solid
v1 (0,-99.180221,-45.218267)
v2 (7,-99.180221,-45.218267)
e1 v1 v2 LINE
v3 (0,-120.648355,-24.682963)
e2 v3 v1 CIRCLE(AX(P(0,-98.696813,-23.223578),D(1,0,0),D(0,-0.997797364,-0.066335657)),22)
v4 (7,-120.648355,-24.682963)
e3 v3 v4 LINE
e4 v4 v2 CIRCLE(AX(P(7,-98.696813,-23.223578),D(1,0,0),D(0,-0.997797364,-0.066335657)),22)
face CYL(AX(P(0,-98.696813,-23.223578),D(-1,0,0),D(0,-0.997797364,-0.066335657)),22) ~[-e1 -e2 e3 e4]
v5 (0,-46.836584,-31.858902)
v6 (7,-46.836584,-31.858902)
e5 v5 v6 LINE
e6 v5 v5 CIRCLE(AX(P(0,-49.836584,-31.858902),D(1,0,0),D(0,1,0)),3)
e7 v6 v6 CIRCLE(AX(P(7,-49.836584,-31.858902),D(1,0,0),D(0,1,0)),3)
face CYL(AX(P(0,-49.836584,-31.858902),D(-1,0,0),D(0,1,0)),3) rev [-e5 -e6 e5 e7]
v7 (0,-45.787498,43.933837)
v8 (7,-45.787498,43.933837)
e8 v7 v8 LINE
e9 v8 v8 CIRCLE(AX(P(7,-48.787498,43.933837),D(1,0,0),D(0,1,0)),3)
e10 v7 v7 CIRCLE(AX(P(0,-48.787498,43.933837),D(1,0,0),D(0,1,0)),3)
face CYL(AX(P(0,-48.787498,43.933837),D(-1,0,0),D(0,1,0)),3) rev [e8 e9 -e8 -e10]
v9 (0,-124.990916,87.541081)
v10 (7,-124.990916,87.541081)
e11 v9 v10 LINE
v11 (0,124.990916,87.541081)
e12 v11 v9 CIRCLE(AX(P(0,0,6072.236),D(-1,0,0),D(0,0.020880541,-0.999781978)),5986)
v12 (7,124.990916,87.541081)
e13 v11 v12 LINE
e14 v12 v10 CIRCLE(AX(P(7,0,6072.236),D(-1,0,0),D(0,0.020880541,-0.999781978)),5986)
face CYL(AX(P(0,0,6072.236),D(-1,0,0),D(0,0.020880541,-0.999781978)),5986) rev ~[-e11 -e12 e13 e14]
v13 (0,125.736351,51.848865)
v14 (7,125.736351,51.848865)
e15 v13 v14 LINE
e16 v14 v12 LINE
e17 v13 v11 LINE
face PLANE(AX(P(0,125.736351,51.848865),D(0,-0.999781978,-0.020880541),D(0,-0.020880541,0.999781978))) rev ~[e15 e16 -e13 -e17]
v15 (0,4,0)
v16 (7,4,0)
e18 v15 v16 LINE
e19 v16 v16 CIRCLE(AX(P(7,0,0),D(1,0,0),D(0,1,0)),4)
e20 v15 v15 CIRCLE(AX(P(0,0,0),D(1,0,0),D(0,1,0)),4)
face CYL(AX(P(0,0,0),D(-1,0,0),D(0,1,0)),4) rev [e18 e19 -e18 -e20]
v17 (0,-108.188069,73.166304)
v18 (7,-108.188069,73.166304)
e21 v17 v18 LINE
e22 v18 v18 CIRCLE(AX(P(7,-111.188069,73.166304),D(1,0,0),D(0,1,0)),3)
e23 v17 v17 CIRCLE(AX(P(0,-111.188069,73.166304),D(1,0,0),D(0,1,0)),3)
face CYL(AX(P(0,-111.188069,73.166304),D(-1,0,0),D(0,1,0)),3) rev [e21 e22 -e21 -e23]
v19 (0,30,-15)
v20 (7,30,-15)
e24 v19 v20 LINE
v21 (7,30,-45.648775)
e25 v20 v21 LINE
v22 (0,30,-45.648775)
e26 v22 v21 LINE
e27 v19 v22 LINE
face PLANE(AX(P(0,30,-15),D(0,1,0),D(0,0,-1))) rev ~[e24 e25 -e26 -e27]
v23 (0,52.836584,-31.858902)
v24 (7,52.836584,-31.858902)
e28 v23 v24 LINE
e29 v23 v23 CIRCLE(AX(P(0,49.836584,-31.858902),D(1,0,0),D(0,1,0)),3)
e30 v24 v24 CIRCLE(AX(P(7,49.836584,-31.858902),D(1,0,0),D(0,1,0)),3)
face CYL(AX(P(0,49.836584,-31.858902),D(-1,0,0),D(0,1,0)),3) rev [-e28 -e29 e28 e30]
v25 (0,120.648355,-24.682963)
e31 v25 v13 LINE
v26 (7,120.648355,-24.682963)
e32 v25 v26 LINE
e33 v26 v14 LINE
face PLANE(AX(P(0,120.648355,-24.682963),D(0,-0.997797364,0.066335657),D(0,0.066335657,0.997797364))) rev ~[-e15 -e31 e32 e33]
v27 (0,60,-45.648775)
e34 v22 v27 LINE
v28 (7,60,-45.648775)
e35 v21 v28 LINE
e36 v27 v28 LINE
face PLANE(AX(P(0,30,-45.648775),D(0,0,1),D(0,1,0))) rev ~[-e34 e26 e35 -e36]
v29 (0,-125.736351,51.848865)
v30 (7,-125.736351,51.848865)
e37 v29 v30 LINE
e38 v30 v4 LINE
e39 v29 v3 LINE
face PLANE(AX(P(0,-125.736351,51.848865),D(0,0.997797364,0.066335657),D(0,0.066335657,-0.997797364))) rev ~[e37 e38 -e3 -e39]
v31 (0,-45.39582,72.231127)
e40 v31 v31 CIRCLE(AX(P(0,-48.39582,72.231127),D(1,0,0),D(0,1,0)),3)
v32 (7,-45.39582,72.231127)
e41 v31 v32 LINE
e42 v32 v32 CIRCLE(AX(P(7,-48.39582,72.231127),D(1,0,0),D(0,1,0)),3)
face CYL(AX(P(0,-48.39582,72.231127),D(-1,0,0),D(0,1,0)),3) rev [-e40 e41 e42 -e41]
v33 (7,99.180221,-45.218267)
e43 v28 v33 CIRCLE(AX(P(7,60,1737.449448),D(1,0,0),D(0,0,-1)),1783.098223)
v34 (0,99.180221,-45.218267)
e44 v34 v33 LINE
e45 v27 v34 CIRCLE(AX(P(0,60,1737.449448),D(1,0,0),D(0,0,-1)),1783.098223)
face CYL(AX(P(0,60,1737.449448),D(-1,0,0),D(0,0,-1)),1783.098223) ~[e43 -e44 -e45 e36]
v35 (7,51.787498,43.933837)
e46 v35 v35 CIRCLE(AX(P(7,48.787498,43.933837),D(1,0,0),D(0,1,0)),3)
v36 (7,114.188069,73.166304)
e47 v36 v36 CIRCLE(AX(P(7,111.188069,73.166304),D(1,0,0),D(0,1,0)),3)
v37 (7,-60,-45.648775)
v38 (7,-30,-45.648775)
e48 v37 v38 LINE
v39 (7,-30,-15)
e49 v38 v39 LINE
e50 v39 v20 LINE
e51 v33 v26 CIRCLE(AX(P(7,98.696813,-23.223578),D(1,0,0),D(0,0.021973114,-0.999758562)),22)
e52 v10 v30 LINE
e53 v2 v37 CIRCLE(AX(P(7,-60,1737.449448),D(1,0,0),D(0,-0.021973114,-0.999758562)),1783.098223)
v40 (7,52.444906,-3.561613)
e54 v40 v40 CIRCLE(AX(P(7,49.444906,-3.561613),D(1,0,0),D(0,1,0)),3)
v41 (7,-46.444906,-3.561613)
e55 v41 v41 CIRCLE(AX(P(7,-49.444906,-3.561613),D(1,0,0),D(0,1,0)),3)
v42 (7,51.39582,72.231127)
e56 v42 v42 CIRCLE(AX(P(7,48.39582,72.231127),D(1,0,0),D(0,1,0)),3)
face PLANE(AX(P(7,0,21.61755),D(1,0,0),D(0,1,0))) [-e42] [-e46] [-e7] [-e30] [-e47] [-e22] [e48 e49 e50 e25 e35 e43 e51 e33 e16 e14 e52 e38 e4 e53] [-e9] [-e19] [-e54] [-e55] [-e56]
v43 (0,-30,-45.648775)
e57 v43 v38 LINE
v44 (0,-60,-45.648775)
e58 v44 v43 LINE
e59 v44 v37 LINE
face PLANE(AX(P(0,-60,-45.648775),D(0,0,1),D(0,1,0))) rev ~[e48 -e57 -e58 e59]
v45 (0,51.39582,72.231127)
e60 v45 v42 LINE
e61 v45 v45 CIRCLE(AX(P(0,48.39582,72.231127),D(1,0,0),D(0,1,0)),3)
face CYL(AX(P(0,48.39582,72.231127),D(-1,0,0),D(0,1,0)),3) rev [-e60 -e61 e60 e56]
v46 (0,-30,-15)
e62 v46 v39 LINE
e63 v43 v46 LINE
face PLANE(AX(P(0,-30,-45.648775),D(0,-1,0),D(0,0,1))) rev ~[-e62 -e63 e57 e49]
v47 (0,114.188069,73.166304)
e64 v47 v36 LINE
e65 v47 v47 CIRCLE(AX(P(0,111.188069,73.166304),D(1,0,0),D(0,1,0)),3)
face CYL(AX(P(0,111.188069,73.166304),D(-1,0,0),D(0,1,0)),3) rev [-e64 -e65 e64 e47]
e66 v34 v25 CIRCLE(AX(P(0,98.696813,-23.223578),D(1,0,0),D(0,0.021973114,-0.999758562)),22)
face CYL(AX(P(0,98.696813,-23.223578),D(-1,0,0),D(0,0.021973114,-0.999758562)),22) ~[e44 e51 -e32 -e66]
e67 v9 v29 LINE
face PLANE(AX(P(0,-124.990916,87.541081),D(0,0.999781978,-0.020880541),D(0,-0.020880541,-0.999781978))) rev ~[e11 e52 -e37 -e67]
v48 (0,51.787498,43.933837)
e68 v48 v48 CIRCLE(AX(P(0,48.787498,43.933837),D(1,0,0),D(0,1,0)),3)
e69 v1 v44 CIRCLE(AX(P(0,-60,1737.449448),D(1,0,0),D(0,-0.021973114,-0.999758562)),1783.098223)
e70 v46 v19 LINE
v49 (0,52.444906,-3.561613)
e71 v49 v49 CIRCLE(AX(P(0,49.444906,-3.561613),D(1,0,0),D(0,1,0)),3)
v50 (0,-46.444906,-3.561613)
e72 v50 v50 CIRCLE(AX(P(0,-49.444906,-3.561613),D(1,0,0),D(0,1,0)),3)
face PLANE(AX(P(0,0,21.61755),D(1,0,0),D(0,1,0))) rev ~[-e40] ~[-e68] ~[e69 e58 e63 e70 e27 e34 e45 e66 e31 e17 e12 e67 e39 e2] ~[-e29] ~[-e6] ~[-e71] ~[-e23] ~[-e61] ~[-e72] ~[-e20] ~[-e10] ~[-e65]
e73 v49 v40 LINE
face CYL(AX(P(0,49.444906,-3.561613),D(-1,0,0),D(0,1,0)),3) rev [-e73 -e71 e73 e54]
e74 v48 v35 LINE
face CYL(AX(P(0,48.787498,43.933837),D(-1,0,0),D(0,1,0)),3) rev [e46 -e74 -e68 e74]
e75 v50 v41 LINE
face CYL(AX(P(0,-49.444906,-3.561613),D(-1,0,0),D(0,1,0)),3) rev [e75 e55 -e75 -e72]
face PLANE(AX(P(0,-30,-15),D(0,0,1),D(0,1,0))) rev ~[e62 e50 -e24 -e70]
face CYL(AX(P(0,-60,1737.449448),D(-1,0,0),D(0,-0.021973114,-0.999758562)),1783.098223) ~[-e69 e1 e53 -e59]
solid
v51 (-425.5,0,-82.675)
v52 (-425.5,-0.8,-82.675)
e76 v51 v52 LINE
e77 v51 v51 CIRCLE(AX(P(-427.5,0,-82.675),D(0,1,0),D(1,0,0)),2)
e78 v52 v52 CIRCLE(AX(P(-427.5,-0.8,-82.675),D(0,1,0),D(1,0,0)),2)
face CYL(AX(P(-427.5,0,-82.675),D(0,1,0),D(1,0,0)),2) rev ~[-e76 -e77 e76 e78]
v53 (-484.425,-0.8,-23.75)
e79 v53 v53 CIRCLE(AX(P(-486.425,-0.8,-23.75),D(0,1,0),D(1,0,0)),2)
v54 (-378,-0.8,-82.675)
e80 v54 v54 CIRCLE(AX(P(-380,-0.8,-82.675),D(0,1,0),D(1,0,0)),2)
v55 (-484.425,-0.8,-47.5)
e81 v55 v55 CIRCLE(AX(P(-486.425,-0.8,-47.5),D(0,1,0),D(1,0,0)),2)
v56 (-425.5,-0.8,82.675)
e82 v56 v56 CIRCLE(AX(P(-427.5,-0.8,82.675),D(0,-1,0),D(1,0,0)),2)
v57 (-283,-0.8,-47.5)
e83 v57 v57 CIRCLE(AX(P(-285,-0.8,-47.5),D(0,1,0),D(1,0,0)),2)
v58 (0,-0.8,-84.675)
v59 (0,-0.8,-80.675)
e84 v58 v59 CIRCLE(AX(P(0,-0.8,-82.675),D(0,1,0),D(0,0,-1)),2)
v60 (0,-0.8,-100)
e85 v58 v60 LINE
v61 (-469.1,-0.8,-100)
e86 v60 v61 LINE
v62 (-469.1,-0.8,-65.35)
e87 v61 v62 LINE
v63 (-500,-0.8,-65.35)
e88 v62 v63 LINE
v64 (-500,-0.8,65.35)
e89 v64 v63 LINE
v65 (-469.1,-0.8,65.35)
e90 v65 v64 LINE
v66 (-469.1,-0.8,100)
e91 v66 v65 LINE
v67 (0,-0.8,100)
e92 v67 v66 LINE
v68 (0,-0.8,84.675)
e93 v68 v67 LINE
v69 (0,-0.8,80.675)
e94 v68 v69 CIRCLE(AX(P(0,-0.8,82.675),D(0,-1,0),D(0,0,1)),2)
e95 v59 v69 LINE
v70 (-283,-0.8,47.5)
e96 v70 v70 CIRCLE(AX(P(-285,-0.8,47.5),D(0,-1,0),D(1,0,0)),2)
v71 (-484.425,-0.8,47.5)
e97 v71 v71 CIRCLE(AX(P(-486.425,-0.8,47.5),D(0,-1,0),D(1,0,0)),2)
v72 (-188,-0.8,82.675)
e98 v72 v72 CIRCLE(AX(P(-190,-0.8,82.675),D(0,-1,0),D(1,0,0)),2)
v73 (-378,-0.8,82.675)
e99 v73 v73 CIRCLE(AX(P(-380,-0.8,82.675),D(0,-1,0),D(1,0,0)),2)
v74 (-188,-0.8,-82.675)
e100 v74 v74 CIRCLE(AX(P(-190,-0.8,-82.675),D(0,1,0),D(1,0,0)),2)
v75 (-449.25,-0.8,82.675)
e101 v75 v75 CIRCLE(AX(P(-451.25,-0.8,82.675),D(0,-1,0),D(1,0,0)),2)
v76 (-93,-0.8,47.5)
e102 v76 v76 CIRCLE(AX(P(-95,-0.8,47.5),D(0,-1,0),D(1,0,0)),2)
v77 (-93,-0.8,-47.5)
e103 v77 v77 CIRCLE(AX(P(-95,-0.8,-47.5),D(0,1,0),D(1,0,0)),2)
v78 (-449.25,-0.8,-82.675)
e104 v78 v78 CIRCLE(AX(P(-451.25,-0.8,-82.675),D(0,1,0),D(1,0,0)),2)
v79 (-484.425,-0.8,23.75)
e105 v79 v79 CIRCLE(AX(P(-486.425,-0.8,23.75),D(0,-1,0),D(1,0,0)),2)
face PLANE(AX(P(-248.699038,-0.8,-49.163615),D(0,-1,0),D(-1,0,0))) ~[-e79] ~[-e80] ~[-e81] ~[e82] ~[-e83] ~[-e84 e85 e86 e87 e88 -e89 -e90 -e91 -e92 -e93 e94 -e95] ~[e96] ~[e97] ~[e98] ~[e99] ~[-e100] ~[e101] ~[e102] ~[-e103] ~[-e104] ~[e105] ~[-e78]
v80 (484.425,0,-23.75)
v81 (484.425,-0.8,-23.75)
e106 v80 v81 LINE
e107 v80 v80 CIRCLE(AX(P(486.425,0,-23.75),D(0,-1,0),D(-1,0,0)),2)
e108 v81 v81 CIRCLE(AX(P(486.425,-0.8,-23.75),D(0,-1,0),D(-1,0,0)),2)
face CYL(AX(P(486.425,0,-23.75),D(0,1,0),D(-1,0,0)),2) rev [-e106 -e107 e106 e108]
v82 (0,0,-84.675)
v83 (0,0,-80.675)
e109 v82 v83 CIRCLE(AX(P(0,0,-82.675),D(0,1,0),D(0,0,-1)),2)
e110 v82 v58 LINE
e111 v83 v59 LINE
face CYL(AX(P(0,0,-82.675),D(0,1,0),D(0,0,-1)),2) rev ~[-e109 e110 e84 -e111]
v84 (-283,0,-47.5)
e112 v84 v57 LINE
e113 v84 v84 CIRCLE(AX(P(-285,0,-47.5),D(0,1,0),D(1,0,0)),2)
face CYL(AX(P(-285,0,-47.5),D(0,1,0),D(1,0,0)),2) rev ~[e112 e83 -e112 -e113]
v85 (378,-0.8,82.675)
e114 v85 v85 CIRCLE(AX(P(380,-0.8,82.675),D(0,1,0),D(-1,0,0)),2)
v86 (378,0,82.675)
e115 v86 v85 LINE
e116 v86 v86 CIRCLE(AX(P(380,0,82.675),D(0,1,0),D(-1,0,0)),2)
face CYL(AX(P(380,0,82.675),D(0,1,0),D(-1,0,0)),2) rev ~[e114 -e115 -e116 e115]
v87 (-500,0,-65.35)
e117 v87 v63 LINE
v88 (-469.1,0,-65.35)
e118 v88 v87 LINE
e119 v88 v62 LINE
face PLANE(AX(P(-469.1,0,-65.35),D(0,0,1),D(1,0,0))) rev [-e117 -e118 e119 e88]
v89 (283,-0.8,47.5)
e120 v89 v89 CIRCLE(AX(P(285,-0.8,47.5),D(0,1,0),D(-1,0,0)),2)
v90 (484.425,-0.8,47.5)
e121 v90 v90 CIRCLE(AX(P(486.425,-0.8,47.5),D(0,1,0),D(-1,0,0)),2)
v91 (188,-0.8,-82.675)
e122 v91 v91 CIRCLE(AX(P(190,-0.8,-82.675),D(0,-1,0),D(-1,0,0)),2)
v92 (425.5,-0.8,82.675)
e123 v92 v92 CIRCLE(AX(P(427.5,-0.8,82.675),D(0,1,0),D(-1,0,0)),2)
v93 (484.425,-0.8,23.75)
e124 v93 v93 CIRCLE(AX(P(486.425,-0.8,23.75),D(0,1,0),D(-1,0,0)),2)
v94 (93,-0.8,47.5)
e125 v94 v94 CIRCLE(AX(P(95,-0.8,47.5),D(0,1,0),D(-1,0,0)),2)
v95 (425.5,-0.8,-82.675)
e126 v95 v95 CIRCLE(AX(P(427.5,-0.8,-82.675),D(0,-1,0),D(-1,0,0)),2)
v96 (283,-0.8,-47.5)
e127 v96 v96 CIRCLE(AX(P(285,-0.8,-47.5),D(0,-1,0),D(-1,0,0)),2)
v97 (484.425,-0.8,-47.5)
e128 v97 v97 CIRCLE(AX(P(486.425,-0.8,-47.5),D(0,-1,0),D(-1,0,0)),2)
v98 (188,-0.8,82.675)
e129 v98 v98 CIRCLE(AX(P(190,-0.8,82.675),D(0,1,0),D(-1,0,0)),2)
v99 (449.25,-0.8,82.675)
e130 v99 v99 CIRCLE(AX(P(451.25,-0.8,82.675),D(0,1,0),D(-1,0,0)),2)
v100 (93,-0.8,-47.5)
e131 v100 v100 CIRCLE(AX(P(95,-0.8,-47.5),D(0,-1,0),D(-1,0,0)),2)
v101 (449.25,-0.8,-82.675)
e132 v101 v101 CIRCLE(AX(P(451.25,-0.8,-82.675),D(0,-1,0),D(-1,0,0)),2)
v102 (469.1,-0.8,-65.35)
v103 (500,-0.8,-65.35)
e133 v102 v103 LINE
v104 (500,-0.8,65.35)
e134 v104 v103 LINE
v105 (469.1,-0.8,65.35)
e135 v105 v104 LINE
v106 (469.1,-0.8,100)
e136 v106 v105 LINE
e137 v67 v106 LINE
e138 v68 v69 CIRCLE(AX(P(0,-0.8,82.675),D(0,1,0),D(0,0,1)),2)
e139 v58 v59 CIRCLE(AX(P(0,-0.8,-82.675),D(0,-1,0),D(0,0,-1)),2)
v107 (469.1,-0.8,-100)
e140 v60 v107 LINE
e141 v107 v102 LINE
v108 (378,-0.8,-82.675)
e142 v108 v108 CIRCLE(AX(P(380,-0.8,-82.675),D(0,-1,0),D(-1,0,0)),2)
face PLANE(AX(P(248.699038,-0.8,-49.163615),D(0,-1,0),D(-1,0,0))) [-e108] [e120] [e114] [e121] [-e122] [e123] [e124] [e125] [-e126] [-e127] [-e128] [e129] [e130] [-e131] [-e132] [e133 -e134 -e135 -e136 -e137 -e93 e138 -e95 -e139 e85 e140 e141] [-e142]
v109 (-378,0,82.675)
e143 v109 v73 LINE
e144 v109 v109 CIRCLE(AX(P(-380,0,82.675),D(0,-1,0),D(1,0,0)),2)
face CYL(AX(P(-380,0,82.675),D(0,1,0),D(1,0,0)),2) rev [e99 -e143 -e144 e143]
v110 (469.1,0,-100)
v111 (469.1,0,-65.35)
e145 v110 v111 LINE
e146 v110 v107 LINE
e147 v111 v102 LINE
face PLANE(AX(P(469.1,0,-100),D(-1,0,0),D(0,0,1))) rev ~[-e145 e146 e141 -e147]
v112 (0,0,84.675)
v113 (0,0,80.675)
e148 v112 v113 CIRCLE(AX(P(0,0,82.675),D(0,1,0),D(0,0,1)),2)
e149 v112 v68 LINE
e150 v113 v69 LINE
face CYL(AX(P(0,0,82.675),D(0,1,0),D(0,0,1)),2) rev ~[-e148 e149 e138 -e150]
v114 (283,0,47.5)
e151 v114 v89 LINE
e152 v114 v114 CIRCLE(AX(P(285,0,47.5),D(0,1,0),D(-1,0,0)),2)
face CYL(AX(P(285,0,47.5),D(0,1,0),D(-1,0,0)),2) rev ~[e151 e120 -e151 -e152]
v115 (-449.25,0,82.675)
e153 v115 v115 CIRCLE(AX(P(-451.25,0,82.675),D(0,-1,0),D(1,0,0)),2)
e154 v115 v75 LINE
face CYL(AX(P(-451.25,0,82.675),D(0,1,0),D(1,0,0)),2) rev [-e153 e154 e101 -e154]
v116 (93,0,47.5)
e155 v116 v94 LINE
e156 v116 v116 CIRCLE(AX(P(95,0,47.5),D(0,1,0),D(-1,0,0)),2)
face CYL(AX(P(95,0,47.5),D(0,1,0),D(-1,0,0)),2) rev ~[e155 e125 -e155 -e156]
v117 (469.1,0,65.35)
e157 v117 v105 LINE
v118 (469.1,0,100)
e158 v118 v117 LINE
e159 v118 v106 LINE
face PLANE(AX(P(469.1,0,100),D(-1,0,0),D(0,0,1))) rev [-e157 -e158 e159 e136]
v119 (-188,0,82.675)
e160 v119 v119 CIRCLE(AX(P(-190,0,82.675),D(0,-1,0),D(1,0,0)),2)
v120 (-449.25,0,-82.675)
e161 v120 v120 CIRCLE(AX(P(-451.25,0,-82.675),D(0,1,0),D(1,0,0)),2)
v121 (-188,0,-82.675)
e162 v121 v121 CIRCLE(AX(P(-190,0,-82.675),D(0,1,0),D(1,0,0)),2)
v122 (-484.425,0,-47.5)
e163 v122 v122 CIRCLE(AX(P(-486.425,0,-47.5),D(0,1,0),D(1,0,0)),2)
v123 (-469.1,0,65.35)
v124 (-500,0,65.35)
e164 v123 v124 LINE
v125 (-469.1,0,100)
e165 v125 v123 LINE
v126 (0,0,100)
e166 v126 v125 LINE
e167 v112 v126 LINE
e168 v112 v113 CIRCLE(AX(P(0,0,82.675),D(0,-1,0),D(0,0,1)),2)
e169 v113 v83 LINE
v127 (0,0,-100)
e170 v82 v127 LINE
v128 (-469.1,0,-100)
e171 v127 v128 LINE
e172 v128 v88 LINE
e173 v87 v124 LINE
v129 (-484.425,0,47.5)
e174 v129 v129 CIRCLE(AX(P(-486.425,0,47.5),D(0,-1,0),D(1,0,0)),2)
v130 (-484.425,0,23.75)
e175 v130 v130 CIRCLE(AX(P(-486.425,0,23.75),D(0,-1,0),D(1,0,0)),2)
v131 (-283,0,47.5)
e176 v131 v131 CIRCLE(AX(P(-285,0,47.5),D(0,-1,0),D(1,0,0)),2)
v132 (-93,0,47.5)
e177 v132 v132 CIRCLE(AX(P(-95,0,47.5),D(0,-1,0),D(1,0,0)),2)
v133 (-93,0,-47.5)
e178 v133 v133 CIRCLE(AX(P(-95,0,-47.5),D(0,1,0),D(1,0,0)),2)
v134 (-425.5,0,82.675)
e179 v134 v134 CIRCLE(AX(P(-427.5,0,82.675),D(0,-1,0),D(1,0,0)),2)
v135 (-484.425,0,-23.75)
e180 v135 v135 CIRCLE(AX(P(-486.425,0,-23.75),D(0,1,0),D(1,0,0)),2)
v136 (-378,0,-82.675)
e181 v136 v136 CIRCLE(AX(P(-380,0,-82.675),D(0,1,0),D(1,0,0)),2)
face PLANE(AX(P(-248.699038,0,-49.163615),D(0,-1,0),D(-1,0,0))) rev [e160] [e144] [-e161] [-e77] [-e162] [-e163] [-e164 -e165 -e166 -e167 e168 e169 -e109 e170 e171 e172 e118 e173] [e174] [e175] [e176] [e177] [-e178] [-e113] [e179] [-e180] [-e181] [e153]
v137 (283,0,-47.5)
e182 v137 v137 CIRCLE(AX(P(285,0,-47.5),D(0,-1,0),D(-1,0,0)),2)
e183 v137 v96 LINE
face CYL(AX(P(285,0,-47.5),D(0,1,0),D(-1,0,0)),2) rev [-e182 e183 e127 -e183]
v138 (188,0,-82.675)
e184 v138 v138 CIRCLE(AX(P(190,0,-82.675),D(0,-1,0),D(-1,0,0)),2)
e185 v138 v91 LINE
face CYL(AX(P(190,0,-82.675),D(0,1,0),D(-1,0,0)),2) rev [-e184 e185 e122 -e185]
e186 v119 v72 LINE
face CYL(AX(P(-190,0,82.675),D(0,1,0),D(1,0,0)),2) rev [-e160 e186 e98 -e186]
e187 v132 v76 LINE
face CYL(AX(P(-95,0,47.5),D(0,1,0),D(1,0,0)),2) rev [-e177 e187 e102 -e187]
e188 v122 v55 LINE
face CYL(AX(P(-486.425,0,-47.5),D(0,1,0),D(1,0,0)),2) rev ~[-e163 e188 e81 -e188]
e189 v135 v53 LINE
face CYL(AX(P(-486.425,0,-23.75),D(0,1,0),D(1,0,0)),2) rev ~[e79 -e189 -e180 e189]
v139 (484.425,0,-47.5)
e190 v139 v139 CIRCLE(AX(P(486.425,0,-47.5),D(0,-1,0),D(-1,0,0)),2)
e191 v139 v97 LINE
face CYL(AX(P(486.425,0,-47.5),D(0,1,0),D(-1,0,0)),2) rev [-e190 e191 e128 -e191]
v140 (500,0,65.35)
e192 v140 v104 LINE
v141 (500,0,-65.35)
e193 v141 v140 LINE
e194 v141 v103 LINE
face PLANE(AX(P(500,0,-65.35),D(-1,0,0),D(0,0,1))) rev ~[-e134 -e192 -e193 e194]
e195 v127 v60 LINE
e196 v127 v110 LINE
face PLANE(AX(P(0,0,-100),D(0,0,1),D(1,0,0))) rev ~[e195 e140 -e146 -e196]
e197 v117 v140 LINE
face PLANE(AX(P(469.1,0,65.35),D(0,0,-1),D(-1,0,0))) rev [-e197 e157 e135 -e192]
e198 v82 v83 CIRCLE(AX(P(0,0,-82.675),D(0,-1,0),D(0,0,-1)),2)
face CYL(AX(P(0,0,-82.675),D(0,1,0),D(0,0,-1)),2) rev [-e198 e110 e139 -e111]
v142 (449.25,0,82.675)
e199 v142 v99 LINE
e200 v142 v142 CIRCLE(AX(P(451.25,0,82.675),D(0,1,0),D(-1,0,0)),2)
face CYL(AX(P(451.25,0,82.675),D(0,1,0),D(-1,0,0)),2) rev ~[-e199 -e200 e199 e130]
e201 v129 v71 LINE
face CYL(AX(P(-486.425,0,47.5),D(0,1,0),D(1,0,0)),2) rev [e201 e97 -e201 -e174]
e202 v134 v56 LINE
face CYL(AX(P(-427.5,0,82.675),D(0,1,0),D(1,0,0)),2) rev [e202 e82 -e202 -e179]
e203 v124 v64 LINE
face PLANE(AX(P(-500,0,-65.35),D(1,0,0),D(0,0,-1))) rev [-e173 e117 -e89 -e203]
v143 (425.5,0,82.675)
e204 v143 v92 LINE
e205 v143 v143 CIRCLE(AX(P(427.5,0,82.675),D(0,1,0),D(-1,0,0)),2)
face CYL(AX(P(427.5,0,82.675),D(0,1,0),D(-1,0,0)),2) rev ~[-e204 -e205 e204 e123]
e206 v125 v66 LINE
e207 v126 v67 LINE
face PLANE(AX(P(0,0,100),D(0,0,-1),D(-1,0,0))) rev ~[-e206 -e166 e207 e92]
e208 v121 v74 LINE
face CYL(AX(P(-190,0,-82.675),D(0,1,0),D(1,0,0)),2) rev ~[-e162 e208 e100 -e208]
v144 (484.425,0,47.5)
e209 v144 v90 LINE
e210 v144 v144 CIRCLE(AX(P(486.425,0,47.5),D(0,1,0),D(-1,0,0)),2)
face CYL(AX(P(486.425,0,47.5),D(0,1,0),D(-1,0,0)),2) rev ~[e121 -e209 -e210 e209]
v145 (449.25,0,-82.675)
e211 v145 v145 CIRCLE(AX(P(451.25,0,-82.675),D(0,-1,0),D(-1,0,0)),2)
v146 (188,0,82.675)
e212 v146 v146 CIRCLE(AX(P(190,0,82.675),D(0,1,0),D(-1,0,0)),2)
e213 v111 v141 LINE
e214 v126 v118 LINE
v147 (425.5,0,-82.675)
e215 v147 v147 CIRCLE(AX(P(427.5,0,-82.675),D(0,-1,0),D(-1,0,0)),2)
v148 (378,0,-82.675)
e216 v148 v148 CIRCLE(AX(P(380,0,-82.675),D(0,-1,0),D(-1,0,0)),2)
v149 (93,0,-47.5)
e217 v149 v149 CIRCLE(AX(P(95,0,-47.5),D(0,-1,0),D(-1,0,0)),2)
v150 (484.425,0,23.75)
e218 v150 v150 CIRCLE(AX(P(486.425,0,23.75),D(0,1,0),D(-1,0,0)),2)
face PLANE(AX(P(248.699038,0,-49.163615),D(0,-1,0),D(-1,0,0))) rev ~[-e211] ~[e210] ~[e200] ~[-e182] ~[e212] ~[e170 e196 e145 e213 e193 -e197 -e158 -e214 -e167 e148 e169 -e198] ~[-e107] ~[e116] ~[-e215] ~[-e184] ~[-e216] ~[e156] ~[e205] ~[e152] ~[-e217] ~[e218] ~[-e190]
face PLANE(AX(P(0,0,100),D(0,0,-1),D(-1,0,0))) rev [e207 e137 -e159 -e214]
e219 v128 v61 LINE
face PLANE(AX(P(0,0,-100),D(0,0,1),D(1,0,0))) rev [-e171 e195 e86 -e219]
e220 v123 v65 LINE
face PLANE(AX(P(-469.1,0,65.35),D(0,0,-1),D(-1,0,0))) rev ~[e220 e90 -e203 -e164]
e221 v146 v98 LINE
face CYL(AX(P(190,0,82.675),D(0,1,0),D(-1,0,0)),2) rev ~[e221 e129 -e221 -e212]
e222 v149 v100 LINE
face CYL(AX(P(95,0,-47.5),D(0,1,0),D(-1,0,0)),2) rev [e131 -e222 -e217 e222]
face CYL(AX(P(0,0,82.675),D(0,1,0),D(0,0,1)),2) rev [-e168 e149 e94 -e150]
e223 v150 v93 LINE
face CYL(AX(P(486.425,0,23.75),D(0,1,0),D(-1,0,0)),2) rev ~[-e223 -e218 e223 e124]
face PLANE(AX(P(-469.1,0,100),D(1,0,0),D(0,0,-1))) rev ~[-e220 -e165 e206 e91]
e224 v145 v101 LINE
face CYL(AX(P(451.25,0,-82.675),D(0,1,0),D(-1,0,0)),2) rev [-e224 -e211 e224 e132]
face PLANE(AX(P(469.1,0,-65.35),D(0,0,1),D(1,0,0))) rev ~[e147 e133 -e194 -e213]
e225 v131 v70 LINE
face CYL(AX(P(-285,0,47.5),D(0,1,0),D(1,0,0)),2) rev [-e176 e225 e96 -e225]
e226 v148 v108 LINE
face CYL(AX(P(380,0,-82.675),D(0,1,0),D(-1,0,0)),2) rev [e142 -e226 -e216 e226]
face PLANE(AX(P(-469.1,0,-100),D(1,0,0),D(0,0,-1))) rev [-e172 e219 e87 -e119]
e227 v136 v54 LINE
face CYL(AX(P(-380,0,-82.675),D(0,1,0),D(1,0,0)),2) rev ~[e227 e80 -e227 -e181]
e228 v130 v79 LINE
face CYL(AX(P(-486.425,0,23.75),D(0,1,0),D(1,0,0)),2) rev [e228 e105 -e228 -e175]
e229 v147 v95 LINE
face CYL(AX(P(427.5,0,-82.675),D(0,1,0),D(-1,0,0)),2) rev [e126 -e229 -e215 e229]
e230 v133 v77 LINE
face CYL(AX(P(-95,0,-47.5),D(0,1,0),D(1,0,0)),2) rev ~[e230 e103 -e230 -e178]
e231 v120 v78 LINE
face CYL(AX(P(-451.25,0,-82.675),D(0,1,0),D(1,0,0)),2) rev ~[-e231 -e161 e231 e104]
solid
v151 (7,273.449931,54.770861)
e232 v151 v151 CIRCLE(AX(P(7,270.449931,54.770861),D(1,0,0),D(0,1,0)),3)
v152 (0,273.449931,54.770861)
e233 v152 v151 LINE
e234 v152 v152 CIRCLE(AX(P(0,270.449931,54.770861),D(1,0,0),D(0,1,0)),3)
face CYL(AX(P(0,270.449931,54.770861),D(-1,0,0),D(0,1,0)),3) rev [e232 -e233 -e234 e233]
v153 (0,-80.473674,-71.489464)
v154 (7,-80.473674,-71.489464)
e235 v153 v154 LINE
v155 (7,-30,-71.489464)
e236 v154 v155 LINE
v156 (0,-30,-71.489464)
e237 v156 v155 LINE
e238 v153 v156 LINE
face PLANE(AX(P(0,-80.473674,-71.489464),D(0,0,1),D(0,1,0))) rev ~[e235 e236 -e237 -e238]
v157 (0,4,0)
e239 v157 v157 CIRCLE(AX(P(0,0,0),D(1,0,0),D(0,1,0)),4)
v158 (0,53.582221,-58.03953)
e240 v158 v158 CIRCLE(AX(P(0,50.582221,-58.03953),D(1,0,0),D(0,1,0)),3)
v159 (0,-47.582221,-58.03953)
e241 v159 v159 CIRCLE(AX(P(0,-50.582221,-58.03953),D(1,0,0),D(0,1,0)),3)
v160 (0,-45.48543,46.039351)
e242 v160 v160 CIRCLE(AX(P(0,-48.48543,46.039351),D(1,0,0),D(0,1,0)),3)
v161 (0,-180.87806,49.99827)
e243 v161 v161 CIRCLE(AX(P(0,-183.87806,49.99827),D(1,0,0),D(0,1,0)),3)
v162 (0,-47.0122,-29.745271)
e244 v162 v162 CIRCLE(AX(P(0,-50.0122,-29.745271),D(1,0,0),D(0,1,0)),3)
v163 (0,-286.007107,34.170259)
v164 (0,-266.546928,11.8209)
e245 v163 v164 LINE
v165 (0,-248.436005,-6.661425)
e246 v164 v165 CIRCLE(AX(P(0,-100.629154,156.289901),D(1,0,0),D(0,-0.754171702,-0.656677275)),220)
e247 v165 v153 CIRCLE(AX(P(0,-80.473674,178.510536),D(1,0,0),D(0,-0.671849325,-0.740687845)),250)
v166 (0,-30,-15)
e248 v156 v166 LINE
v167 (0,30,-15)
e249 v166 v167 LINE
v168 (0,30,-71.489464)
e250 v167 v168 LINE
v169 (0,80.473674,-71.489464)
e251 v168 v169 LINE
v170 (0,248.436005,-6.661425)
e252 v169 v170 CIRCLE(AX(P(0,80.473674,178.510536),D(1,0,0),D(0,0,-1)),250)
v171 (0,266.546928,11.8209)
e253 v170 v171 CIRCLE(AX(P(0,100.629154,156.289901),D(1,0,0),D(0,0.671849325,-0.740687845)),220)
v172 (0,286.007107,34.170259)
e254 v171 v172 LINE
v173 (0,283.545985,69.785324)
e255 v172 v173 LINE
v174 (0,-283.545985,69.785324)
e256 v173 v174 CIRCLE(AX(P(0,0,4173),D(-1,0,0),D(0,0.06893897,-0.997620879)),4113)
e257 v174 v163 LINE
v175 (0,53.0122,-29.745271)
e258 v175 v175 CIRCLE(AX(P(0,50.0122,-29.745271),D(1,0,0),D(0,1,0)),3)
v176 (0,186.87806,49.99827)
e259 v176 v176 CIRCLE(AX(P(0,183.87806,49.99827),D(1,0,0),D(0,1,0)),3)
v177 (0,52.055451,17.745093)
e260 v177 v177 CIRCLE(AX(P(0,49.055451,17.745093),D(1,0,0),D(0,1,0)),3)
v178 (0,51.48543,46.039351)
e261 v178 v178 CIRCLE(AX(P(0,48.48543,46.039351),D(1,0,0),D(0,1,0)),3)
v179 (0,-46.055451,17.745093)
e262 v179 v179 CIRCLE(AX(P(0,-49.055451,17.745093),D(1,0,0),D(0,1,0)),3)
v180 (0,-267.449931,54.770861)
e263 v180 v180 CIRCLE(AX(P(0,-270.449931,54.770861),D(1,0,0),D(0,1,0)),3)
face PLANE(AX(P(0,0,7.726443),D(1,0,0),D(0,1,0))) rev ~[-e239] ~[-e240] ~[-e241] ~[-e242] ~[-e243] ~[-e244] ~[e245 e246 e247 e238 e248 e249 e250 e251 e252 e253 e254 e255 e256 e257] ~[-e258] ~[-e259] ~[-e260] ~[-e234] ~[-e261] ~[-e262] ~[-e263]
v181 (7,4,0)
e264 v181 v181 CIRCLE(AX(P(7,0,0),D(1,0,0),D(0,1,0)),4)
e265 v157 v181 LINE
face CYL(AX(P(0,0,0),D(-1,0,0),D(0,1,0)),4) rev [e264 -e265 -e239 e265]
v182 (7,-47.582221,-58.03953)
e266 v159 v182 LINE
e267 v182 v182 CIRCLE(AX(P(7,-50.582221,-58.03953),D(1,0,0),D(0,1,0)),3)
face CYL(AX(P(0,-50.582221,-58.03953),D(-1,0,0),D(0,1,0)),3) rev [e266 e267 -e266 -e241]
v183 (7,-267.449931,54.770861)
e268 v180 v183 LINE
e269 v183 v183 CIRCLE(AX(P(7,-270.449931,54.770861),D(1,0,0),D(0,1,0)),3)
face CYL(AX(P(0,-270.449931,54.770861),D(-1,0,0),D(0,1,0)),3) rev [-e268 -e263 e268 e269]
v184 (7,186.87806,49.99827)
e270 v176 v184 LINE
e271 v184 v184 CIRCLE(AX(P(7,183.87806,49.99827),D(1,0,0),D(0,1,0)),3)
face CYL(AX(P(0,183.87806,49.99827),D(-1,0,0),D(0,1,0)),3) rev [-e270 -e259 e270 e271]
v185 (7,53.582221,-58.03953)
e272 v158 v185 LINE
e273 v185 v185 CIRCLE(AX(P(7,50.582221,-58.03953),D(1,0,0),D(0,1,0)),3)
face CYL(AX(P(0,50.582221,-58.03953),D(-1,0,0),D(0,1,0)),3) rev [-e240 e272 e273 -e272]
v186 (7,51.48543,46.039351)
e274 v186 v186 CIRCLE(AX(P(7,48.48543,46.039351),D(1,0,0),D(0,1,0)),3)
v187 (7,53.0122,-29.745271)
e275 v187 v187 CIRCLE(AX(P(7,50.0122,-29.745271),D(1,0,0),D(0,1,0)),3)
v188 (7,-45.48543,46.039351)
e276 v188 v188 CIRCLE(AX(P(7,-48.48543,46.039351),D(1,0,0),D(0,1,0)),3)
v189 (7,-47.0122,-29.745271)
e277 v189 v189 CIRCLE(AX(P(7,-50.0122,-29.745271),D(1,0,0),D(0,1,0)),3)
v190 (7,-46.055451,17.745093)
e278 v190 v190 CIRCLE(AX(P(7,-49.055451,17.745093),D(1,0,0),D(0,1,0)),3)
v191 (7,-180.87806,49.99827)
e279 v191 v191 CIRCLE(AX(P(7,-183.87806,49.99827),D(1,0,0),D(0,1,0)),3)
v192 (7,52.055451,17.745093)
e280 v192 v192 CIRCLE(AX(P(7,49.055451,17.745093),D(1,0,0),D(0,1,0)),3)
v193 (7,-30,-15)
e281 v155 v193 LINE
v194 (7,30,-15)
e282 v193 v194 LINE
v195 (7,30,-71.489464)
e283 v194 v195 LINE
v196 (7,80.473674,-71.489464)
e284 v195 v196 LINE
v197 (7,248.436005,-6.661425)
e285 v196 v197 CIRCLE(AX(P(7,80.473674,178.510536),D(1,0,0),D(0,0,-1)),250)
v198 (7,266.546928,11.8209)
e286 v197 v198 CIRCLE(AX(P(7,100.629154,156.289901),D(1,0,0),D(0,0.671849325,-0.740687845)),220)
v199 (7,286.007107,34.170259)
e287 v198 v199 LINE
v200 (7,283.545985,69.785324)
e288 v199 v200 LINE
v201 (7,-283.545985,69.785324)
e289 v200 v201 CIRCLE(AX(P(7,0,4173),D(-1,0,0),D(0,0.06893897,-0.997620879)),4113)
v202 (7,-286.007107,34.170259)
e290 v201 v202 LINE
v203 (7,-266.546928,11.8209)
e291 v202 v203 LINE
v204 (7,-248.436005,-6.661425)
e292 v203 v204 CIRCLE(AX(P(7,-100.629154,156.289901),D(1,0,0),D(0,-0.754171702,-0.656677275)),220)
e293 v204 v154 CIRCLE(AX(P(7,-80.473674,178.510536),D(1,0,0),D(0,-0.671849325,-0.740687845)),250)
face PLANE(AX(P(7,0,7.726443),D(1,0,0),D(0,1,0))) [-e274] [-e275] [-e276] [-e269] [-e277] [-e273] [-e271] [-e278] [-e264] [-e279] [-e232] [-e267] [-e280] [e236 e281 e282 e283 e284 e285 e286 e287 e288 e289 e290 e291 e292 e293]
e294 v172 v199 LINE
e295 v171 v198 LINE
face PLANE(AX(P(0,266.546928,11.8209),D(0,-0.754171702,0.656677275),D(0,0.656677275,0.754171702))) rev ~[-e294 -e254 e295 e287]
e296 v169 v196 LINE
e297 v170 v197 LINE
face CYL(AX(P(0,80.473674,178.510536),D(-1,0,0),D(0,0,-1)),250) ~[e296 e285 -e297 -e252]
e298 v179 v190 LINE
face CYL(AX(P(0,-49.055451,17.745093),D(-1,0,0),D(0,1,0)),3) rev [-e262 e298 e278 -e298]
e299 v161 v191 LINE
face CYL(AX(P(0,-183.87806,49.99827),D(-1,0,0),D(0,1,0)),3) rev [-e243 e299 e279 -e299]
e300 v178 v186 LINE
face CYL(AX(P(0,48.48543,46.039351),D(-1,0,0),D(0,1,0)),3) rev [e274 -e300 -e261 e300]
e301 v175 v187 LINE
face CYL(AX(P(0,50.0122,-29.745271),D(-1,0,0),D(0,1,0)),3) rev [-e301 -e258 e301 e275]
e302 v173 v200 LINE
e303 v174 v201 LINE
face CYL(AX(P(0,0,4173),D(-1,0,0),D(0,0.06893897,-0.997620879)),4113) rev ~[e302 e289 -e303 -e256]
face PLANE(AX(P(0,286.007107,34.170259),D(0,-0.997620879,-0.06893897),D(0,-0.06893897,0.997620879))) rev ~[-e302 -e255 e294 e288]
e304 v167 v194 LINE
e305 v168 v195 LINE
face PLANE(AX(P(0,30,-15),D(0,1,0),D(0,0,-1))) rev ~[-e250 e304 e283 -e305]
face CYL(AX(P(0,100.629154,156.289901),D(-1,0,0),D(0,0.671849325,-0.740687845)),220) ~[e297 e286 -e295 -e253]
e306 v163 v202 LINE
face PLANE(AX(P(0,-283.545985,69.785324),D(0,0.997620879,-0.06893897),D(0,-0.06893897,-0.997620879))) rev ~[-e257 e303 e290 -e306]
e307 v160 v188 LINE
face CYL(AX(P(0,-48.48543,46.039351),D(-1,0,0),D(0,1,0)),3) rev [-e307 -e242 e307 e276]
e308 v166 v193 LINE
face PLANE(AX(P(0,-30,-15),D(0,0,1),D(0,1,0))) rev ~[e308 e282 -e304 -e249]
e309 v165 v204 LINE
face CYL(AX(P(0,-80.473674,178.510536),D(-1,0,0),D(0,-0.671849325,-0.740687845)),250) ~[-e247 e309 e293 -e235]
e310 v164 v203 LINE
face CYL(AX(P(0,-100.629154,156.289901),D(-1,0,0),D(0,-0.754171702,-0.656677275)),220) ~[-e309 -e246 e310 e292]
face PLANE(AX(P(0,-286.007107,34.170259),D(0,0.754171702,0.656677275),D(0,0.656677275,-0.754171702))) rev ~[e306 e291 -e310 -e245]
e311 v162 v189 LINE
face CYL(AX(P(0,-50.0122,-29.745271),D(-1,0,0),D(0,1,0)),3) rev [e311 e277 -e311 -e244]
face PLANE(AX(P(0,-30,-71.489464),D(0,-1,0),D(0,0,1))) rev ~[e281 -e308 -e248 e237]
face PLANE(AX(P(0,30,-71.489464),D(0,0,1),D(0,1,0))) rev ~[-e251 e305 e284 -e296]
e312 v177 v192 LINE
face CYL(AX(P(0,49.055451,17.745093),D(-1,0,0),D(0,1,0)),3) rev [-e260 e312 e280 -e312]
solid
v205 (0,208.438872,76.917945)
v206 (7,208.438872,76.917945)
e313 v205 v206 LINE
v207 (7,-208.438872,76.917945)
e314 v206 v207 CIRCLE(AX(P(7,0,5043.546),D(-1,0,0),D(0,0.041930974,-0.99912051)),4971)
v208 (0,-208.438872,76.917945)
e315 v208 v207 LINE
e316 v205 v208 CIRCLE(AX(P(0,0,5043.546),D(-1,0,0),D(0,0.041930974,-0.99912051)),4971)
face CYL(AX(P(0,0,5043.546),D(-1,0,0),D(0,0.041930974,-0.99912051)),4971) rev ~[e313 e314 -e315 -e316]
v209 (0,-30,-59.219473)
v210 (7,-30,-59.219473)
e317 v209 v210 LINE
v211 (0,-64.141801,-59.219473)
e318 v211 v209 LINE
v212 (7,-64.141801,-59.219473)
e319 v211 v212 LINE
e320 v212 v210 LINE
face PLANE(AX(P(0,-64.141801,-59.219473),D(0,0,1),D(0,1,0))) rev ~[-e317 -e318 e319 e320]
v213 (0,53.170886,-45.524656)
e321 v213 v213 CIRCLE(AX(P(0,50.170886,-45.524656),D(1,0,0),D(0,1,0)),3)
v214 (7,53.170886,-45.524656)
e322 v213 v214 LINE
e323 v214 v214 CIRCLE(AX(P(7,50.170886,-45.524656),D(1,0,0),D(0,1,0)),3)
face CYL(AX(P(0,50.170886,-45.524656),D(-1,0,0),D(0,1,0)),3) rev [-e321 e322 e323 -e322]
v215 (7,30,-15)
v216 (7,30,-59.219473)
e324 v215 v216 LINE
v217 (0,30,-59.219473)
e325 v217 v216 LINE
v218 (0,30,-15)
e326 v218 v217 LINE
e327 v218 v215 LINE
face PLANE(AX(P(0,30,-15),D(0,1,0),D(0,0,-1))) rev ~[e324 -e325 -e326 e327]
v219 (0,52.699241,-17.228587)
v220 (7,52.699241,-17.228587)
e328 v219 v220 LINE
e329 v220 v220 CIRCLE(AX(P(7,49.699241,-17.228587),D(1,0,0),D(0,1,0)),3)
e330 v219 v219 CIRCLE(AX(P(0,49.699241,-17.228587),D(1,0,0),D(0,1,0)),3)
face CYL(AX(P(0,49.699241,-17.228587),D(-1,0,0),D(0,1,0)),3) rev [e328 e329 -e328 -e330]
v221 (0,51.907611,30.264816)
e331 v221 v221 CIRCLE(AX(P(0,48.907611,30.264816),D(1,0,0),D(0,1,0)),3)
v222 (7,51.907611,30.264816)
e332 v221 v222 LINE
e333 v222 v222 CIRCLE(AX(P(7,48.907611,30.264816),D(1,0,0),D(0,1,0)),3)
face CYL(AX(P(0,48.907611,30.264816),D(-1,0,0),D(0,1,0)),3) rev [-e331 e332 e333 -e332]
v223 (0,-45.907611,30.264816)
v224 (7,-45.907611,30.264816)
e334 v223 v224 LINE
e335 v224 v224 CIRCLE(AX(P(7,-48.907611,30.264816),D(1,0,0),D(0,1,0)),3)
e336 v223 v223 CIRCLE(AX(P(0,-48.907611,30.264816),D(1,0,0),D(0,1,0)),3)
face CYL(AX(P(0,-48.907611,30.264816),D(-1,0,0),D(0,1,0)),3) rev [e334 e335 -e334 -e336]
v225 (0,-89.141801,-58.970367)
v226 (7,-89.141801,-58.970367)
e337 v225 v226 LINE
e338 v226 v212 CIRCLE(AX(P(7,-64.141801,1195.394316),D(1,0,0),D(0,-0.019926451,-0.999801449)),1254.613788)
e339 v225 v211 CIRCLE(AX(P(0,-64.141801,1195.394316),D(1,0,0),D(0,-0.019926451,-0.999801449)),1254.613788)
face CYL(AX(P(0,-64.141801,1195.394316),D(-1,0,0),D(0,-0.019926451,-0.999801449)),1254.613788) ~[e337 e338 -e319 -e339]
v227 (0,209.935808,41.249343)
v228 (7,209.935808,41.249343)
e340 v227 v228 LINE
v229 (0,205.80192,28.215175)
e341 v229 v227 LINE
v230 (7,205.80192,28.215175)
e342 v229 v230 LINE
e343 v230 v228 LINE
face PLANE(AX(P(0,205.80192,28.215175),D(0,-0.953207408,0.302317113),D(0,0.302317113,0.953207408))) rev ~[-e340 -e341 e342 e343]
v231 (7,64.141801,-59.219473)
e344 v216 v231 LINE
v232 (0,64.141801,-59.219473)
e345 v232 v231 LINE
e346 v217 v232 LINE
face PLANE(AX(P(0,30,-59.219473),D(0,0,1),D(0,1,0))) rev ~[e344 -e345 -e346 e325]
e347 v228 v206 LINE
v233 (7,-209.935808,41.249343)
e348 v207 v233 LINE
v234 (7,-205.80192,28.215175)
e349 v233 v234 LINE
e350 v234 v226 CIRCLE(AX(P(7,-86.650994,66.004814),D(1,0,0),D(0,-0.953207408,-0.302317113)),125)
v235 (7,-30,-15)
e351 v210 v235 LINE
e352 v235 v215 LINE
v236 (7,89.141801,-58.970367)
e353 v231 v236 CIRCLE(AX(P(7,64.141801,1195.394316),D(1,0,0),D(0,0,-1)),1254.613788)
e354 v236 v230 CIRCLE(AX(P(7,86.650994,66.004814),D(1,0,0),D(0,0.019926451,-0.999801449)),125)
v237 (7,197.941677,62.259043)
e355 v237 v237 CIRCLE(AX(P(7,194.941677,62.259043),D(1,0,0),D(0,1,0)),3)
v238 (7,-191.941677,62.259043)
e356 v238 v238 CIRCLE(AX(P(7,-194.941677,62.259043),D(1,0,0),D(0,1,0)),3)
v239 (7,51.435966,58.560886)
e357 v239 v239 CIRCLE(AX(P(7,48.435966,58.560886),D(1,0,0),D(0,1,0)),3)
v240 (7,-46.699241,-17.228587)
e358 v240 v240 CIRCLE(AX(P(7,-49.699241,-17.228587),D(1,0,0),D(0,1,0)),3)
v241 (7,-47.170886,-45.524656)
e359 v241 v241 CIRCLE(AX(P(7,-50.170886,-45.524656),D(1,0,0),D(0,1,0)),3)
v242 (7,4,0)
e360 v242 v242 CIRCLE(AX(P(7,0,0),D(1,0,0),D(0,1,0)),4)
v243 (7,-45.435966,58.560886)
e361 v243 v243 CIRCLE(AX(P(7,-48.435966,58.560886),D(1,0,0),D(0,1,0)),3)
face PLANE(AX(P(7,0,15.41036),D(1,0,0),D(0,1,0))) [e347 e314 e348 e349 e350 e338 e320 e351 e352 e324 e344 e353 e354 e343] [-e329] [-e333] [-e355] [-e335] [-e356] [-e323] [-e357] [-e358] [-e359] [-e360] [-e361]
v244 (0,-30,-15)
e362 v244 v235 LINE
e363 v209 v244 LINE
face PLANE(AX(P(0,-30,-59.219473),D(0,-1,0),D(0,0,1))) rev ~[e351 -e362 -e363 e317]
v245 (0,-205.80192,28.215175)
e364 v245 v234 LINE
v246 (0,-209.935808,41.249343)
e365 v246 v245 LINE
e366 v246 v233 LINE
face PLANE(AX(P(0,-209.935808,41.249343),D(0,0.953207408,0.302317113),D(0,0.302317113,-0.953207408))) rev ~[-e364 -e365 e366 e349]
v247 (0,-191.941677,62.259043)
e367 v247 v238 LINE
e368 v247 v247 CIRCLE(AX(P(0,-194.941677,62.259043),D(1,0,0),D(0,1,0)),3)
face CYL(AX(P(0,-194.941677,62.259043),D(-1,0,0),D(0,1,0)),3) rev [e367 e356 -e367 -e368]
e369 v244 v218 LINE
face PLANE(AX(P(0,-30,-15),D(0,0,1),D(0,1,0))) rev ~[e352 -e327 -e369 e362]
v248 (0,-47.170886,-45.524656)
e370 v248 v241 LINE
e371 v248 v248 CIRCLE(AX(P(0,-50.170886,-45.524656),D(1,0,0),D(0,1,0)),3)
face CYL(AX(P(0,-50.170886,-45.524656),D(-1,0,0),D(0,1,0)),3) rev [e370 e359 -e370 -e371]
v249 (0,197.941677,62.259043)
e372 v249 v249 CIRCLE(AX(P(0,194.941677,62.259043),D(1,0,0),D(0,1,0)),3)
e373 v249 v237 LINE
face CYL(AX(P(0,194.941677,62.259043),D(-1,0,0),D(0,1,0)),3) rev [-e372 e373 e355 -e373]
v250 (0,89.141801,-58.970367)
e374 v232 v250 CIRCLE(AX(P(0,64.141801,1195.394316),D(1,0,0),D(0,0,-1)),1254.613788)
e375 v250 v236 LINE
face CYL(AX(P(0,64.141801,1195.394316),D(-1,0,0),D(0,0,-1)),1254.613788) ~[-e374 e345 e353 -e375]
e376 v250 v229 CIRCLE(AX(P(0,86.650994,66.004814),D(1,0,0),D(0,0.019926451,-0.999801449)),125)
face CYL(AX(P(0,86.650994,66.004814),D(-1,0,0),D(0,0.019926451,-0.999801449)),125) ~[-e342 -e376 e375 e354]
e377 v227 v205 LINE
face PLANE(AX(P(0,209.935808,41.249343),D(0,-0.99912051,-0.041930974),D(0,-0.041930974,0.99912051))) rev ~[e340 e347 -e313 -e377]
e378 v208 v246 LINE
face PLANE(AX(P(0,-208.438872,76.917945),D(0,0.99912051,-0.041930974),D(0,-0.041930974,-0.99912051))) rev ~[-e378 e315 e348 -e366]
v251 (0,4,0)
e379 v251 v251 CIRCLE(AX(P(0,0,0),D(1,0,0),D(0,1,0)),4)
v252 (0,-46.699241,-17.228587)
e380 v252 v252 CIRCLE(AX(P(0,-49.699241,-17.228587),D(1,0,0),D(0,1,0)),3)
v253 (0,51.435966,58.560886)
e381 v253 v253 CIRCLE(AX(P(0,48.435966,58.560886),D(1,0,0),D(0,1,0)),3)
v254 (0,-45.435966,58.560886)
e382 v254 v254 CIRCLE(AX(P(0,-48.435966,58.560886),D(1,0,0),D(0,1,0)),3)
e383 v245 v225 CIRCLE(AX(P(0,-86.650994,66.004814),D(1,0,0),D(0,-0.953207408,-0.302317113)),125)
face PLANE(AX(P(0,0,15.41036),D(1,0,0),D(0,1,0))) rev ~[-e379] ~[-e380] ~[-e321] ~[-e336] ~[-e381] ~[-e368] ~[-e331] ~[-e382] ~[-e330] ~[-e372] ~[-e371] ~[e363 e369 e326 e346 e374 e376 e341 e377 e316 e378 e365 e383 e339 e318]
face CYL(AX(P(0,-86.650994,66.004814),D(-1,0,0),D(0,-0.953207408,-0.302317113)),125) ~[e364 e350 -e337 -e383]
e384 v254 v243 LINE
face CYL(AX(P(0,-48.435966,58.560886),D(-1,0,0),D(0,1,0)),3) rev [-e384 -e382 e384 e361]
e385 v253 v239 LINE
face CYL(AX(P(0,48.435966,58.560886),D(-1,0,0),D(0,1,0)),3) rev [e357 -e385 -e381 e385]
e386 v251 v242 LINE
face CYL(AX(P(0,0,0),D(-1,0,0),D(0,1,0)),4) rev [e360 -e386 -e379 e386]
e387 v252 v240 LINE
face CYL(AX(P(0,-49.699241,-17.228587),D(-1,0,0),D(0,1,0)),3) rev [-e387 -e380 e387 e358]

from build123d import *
from build123d import SkipClean  # not in build123d's __all__

# Parameters (mm, degrees)
F3_R      = 2
F11_DEPTH = 0.8
F12_DEPTH = 0.8
F4_R      = 3
F4_R_2    = 4
F15_DEPTH = 7
F7_R      = 3
F7_R_2    = 4
F10_R     = 3
F10_R_2   = 4


with BuildPart() as f11:
    # F3 (on Front) → F11 (new body)
    with BuildSketch(Plane.XZ):
        with BuildLine():
            Line((0, 100), (-469.1, 100))
            Line((-469.1, 100), (-469.1, 65.35))
            Line((-469.1, 65.35), (-500, 65.35))
            Line((-500, 65.35), (-500, 0))
            Line((-500, 0), (0, 0))
            Line((0, 0), (0, 80.675))
            ThreePointArc((0, 80.675), (-2, 82.675), (0, 84.675))
            Line((0, 84.675), (0, 100))
        make_face()
        with Locations((-486.425, 23.75)):
            Circle(F3_R, mode=Mode.SUBTRACT)
        with Locations((-486.425, 47.5)):
            Circle(F3_R, mode=Mode.SUBTRACT)
        with Locations((-285, 47.5)):
            Circle(F3_R, mode=Mode.SUBTRACT)
        with Locations((-95, 47.5)):
            Circle(F3_R, mode=Mode.SUBTRACT)
        with Locations((-451.25, 82.675)):
            Circle(F3_R, mode=Mode.SUBTRACT)
        with Locations((-427.5, 82.675)):
            Circle(F3_R, mode=Mode.SUBTRACT)
        with Locations((-380, 82.675)):
            Circle(F3_R, mode=Mode.SUBTRACT)
        with Locations((-190, 82.675)):
            Circle(F3_R, mode=Mode.SUBTRACT)
        with BuildLine():
            Line((0, 80.675), (0, 84.675))
            ThreePointArc((0, 84.675), (-2, 82.675), (0, 80.675))
        make_face()
    extrude(amount=F11_DEPTH)

    # F3 (on Front) → F12 (cut)
    with BuildSketch(Plane.XZ):
        with BuildLine():
            Line((0, 80.675), (0, 84.675))
            ThreePointArc((0, 84.675), (-2, 82.675), (0, 80.675))
        make_face()
    extrude(amount=F12_DEPTH, mode=Mode.SUBTRACT)

    # F13: F11 across plane


with BuildPart() as f11_1:
    add(f11.part, clean=False)
    add(f11.part.mirror(Plane.XY), clean=False)

    # F14: F11 across plane


with BuildPart() as f11_2:
    add(f11_1.part, clean=False)
    with SkipClean():  # cleaning this boolean's faces spoils the solid; the shape is the same uncleaned
        add(f11_1.part.mirror(Plane.YZ), clean=False)


with BuildPart() as f15:
    # F4 (on Right) → F15 (new body)
    with BuildSketch(Plane.YZ):
        with BuildLine():
            ThreePointArc((283.5459854903, 69.7853243935), (0, 60), (-283.5459854903, 69.7853243935))
            Line((-283.5459854904, 69.7853243935), (-286.0071067357, 34.1702590108))
            Line((-286.0071067357, 34.1702590108), (-266.5469280434, 11.8209001342))
            ThreePointArc((-266.5469280434, 11.8209001342), (-257.7634411548, 2.3132281924), (-248.4360051401, -6.6614252866))
            ThreePointArc((-248.4360051401, -6.6614252866), (-170.4931430202, -54.7200262189), (-80.4736738133, -71.489463977))
            Line((-80.4736738133, -71.489463977), (-30, -71.489463977))
            Line((-30, -71.489463977), (-30, -15))
            Line((-30, -15), (30, -15))
            Line((30, -15), (30, -71.489463977))
            Line((30, -71.489463977), (80.4736738133, -71.489463977))
            ThreePointArc((80.4736738133, -71.489463977), (170.4931430202, -54.7200262189), (248.4360051401, -6.6614252866))
            ThreePointArc((248.4360051401, -6.6614252866), (257.7634411547, 2.3132281923), (266.5469280434, 11.8209001342))
            Line((266.5469280434, 11.8209001342), (286.0071067357, 34.1702590108))
            Line((286.0071067357, 34.1702590108), (283.5459854904, 69.7853243935))
        make_face()
        with Locations((-50.582221288, -58.0395296416)):
            Circle(F4_R, mode=Mode.SUBTRACT)
        with Locations((-50.0122002711, -29.7452709299)):
            Circle(F4_R, mode=Mode.SUBTRACT)
        with Locations((50.582221288, -58.0395296416)):
            Circle(F4_R, mode=Mode.SUBTRACT)
        with Locations((50.0122002711, -29.7452709299)):
            Circle(F4_R, mode=Mode.SUBTRACT)
        Circle(F4_R_2, mode=Mode.SUBTRACT)
        with Locations((-49.0554512144, 17.745092632)):
            Circle(F4_R, mode=Mode.SUBTRACT)
        with Locations((-183.8780596918, 49.9982695657)):
            Circle(F4_R, mode=Mode.SUBTRACT)
        with Locations((-270.4499306435, 54.77086055)):
            Circle(F4_R, mode=Mode.SUBTRACT)
        with Locations((-48.4854301975, 46.0393513436)):
            Circle(F4_R, mode=Mode.SUBTRACT)
        with Locations((49.0554512144, 17.745092632)):
            Circle(F4_R, mode=Mode.SUBTRACT)
        with Locations((48.4854301975, 46.0393513436)):
            Circle(F4_R, mode=Mode.SUBTRACT)
        with Locations((183.8780596918, 49.9982695657)):
            Circle(F4_R, mode=Mode.SUBTRACT)
        with Locations((270.4499306435, 54.77086055)):
            Circle(F4_R, mode=Mode.SUBTRACT)
    extrude(amount=F15_DEPTH)


with BuildPart() as f15b:
    # F7 (on Right) → F15, piece 2 (new body)
    with BuildSketch(Plane.YZ):
        with BuildLine():
            ThreePointArc((208.4388718574, 76.9179450014), (0, 72.546), (-208.4388718574, 76.9179450014))
            Line((-208.4388718574, 76.9179450014), (-209.9358076299, 41.249342796))
            Line((-209.9358076299, 41.249342796), (-205.8019202456, 28.2151746717))
            ThreePointArc((-205.8019202456, 28.2151746717), (-161.4808508573, -34.1225678307), (-89.1418005751, -58.9703672559))
            ThreePointArc((-89.1418005751, -58.9703672559), (-76.6424210945, -59.1571947346), (-64.1418005751, -59.2194726218))
            Line((-64.1418005751, -59.2194726218), (-30, -59.2194726218))
            Line((-30, -59.2194726218), (-30, -15))
            Line((-30, -15), (30, -15))
            Line((30, -15), (30, -59.2194726218))
            Line((30, -59.2194726218), (64.1418005751, -59.2194726218))
            ThreePointArc((64.1418005751, -59.2194726218), (76.6424210945, -59.1571947346), (89.1418005751, -58.9703672559))
            ThreePointArc((89.1418005751, -58.9703672559), (161.4808508573, -34.1225678307), (205.8019202456, 28.2151746717))
            Line((205.8019202456, 28.2151746717), (209.9358076299, 41.249342796))
            Line((209.9358076299, 41.249342796), (208.4388718574, 76.9179450014))
        make_face()
        with Locations((-50.1708855913, -45.5246562927)):
            Circle(F7_R, mode=Mode.SUBTRACT)
        with Locations((-49.6992407607, -17.2285867572)):
            Circle(F7_R, mode=Mode.SUBTRACT)
        Circle(F7_R_2, mode=Mode.SUBTRACT)
        with Locations((50.1708855913, -45.5246562927)):
            Circle(F7_R, mode=Mode.SUBTRACT)
        with Locations((49.6992407607, -17.2285867572)):
            Circle(F7_R, mode=Mode.SUBTRACT)
        with Locations((-48.9076107448, 30.2648161733)):
            Circle(F7_R, mode=Mode.SUBTRACT)
        with Locations((-194.941677367, 62.2590425536)):
            Circle(F7_R, mode=Mode.SUBTRACT)
        with Locations((-48.4359659142, 58.5608857087)):
            Circle(F7_R, mode=Mode.SUBTRACT)
        with Locations((48.9076107448, 30.2648161733)):
            Circle(F7_R, mode=Mode.SUBTRACT)
        with Locations((48.4359659142, 58.5608857087)):
            Circle(F7_R, mode=Mode.SUBTRACT)
        with Locations((194.941677367, 62.2590425536)):
            Circle(F7_R, mode=Mode.SUBTRACT)
    extrude(amount=F15_DEPTH)


with BuildPart() as f15c:
    # F10 (on Right) → F15, piece 3 (new body)
    with BuildSketch(Plane.YZ):
        with BuildLine():
            ThreePointArc((124.9909156074, 87.5410812079), (0, 86.236), (-124.9909156074, 87.5410812079))
            Line((-124.9909156074, 87.5410812079), (-125.7363509043, 51.8488646024))
            Line((-125.7363509043, 51.8488646024), (-120.6483548376, -24.6829629057))
            ThreePointArc((-120.6483548376, -24.6829629057), (-113.9039304957, -39.1214893804), (-99.1802213367, -45.2182668132))
            ThreePointArc((-99.1802213367, -45.2182668132), (-79.5912932248, -45.5411443506), (-60, -45.6487745275))
            Line((-60, -45.6487745275), (-30, -45.6487745275))
            Line((-30, -45.6487745275), (-30, -15))
            Line((-30, -15), (30, -15))
            Line((30, -15), (30, -45.6487745275))
            Line((30, -45.6487745275), (60, -45.6487745275))
            ThreePointArc((60, -45.6487745275), (79.5912932248, -45.5411443506), (99.1802213367, -45.2182668132))
            ThreePointArc((99.1802213367, -45.2182668132), (113.9039304957, -39.1214893804), (120.6483548376, -24.6829629057))
            Line((120.6483548376, -24.6829629057), (125.7363509043, 51.8488646024))
            Line((125.7363509043, 51.8488646024), (124.9909156074, 87.5410812079))
        make_face()
        with Locations((-49.8365836496, -31.8589023938)):
            Circle(F10_R, mode=Mode.SUBTRACT)
        with Locations((-49.4449063789, -3.5616129668)):
            Circle(F10_R, mode=Mode.SUBTRACT)
        Circle(F10_R_2, mode=Mode.SUBTRACT)
        with Locations((49.8365836496, -31.8589023938)):
            Circle(F10_R, mode=Mode.SUBTRACT)
        with Locations((49.4449063789, -3.5616129668)):
            Circle(F10_R, mode=Mode.SUBTRACT)
        with Locations((-48.7874975323, 43.9338374849)):
            Circle(F10_R, mode=Mode.SUBTRACT)
        with Locations((-111.188069141, 73.1663035153)):
            Circle(F10_R, mode=Mode.SUBTRACT)
        with Locations((-48.3958202616, 72.2311269119)):
            Circle(F10_R, mode=Mode.SUBTRACT)
        with Locations((48.7874975323, 43.9338374849)):
            Circle(F10_R, mode=Mode.SUBTRACT)
        with Locations((48.3958202616, 72.2311269119)):
            Circle(F10_R, mode=Mode.SUBTRACT)
        with Locations((111.188069141, 73.1663035153)):
            Circle(F10_R, mode=Mode.SUBTRACT)
    extrude(amount=F15_DEPTH)


solid = Compound([f11_2.part, f15.part, f15b.part, f15c.part])
